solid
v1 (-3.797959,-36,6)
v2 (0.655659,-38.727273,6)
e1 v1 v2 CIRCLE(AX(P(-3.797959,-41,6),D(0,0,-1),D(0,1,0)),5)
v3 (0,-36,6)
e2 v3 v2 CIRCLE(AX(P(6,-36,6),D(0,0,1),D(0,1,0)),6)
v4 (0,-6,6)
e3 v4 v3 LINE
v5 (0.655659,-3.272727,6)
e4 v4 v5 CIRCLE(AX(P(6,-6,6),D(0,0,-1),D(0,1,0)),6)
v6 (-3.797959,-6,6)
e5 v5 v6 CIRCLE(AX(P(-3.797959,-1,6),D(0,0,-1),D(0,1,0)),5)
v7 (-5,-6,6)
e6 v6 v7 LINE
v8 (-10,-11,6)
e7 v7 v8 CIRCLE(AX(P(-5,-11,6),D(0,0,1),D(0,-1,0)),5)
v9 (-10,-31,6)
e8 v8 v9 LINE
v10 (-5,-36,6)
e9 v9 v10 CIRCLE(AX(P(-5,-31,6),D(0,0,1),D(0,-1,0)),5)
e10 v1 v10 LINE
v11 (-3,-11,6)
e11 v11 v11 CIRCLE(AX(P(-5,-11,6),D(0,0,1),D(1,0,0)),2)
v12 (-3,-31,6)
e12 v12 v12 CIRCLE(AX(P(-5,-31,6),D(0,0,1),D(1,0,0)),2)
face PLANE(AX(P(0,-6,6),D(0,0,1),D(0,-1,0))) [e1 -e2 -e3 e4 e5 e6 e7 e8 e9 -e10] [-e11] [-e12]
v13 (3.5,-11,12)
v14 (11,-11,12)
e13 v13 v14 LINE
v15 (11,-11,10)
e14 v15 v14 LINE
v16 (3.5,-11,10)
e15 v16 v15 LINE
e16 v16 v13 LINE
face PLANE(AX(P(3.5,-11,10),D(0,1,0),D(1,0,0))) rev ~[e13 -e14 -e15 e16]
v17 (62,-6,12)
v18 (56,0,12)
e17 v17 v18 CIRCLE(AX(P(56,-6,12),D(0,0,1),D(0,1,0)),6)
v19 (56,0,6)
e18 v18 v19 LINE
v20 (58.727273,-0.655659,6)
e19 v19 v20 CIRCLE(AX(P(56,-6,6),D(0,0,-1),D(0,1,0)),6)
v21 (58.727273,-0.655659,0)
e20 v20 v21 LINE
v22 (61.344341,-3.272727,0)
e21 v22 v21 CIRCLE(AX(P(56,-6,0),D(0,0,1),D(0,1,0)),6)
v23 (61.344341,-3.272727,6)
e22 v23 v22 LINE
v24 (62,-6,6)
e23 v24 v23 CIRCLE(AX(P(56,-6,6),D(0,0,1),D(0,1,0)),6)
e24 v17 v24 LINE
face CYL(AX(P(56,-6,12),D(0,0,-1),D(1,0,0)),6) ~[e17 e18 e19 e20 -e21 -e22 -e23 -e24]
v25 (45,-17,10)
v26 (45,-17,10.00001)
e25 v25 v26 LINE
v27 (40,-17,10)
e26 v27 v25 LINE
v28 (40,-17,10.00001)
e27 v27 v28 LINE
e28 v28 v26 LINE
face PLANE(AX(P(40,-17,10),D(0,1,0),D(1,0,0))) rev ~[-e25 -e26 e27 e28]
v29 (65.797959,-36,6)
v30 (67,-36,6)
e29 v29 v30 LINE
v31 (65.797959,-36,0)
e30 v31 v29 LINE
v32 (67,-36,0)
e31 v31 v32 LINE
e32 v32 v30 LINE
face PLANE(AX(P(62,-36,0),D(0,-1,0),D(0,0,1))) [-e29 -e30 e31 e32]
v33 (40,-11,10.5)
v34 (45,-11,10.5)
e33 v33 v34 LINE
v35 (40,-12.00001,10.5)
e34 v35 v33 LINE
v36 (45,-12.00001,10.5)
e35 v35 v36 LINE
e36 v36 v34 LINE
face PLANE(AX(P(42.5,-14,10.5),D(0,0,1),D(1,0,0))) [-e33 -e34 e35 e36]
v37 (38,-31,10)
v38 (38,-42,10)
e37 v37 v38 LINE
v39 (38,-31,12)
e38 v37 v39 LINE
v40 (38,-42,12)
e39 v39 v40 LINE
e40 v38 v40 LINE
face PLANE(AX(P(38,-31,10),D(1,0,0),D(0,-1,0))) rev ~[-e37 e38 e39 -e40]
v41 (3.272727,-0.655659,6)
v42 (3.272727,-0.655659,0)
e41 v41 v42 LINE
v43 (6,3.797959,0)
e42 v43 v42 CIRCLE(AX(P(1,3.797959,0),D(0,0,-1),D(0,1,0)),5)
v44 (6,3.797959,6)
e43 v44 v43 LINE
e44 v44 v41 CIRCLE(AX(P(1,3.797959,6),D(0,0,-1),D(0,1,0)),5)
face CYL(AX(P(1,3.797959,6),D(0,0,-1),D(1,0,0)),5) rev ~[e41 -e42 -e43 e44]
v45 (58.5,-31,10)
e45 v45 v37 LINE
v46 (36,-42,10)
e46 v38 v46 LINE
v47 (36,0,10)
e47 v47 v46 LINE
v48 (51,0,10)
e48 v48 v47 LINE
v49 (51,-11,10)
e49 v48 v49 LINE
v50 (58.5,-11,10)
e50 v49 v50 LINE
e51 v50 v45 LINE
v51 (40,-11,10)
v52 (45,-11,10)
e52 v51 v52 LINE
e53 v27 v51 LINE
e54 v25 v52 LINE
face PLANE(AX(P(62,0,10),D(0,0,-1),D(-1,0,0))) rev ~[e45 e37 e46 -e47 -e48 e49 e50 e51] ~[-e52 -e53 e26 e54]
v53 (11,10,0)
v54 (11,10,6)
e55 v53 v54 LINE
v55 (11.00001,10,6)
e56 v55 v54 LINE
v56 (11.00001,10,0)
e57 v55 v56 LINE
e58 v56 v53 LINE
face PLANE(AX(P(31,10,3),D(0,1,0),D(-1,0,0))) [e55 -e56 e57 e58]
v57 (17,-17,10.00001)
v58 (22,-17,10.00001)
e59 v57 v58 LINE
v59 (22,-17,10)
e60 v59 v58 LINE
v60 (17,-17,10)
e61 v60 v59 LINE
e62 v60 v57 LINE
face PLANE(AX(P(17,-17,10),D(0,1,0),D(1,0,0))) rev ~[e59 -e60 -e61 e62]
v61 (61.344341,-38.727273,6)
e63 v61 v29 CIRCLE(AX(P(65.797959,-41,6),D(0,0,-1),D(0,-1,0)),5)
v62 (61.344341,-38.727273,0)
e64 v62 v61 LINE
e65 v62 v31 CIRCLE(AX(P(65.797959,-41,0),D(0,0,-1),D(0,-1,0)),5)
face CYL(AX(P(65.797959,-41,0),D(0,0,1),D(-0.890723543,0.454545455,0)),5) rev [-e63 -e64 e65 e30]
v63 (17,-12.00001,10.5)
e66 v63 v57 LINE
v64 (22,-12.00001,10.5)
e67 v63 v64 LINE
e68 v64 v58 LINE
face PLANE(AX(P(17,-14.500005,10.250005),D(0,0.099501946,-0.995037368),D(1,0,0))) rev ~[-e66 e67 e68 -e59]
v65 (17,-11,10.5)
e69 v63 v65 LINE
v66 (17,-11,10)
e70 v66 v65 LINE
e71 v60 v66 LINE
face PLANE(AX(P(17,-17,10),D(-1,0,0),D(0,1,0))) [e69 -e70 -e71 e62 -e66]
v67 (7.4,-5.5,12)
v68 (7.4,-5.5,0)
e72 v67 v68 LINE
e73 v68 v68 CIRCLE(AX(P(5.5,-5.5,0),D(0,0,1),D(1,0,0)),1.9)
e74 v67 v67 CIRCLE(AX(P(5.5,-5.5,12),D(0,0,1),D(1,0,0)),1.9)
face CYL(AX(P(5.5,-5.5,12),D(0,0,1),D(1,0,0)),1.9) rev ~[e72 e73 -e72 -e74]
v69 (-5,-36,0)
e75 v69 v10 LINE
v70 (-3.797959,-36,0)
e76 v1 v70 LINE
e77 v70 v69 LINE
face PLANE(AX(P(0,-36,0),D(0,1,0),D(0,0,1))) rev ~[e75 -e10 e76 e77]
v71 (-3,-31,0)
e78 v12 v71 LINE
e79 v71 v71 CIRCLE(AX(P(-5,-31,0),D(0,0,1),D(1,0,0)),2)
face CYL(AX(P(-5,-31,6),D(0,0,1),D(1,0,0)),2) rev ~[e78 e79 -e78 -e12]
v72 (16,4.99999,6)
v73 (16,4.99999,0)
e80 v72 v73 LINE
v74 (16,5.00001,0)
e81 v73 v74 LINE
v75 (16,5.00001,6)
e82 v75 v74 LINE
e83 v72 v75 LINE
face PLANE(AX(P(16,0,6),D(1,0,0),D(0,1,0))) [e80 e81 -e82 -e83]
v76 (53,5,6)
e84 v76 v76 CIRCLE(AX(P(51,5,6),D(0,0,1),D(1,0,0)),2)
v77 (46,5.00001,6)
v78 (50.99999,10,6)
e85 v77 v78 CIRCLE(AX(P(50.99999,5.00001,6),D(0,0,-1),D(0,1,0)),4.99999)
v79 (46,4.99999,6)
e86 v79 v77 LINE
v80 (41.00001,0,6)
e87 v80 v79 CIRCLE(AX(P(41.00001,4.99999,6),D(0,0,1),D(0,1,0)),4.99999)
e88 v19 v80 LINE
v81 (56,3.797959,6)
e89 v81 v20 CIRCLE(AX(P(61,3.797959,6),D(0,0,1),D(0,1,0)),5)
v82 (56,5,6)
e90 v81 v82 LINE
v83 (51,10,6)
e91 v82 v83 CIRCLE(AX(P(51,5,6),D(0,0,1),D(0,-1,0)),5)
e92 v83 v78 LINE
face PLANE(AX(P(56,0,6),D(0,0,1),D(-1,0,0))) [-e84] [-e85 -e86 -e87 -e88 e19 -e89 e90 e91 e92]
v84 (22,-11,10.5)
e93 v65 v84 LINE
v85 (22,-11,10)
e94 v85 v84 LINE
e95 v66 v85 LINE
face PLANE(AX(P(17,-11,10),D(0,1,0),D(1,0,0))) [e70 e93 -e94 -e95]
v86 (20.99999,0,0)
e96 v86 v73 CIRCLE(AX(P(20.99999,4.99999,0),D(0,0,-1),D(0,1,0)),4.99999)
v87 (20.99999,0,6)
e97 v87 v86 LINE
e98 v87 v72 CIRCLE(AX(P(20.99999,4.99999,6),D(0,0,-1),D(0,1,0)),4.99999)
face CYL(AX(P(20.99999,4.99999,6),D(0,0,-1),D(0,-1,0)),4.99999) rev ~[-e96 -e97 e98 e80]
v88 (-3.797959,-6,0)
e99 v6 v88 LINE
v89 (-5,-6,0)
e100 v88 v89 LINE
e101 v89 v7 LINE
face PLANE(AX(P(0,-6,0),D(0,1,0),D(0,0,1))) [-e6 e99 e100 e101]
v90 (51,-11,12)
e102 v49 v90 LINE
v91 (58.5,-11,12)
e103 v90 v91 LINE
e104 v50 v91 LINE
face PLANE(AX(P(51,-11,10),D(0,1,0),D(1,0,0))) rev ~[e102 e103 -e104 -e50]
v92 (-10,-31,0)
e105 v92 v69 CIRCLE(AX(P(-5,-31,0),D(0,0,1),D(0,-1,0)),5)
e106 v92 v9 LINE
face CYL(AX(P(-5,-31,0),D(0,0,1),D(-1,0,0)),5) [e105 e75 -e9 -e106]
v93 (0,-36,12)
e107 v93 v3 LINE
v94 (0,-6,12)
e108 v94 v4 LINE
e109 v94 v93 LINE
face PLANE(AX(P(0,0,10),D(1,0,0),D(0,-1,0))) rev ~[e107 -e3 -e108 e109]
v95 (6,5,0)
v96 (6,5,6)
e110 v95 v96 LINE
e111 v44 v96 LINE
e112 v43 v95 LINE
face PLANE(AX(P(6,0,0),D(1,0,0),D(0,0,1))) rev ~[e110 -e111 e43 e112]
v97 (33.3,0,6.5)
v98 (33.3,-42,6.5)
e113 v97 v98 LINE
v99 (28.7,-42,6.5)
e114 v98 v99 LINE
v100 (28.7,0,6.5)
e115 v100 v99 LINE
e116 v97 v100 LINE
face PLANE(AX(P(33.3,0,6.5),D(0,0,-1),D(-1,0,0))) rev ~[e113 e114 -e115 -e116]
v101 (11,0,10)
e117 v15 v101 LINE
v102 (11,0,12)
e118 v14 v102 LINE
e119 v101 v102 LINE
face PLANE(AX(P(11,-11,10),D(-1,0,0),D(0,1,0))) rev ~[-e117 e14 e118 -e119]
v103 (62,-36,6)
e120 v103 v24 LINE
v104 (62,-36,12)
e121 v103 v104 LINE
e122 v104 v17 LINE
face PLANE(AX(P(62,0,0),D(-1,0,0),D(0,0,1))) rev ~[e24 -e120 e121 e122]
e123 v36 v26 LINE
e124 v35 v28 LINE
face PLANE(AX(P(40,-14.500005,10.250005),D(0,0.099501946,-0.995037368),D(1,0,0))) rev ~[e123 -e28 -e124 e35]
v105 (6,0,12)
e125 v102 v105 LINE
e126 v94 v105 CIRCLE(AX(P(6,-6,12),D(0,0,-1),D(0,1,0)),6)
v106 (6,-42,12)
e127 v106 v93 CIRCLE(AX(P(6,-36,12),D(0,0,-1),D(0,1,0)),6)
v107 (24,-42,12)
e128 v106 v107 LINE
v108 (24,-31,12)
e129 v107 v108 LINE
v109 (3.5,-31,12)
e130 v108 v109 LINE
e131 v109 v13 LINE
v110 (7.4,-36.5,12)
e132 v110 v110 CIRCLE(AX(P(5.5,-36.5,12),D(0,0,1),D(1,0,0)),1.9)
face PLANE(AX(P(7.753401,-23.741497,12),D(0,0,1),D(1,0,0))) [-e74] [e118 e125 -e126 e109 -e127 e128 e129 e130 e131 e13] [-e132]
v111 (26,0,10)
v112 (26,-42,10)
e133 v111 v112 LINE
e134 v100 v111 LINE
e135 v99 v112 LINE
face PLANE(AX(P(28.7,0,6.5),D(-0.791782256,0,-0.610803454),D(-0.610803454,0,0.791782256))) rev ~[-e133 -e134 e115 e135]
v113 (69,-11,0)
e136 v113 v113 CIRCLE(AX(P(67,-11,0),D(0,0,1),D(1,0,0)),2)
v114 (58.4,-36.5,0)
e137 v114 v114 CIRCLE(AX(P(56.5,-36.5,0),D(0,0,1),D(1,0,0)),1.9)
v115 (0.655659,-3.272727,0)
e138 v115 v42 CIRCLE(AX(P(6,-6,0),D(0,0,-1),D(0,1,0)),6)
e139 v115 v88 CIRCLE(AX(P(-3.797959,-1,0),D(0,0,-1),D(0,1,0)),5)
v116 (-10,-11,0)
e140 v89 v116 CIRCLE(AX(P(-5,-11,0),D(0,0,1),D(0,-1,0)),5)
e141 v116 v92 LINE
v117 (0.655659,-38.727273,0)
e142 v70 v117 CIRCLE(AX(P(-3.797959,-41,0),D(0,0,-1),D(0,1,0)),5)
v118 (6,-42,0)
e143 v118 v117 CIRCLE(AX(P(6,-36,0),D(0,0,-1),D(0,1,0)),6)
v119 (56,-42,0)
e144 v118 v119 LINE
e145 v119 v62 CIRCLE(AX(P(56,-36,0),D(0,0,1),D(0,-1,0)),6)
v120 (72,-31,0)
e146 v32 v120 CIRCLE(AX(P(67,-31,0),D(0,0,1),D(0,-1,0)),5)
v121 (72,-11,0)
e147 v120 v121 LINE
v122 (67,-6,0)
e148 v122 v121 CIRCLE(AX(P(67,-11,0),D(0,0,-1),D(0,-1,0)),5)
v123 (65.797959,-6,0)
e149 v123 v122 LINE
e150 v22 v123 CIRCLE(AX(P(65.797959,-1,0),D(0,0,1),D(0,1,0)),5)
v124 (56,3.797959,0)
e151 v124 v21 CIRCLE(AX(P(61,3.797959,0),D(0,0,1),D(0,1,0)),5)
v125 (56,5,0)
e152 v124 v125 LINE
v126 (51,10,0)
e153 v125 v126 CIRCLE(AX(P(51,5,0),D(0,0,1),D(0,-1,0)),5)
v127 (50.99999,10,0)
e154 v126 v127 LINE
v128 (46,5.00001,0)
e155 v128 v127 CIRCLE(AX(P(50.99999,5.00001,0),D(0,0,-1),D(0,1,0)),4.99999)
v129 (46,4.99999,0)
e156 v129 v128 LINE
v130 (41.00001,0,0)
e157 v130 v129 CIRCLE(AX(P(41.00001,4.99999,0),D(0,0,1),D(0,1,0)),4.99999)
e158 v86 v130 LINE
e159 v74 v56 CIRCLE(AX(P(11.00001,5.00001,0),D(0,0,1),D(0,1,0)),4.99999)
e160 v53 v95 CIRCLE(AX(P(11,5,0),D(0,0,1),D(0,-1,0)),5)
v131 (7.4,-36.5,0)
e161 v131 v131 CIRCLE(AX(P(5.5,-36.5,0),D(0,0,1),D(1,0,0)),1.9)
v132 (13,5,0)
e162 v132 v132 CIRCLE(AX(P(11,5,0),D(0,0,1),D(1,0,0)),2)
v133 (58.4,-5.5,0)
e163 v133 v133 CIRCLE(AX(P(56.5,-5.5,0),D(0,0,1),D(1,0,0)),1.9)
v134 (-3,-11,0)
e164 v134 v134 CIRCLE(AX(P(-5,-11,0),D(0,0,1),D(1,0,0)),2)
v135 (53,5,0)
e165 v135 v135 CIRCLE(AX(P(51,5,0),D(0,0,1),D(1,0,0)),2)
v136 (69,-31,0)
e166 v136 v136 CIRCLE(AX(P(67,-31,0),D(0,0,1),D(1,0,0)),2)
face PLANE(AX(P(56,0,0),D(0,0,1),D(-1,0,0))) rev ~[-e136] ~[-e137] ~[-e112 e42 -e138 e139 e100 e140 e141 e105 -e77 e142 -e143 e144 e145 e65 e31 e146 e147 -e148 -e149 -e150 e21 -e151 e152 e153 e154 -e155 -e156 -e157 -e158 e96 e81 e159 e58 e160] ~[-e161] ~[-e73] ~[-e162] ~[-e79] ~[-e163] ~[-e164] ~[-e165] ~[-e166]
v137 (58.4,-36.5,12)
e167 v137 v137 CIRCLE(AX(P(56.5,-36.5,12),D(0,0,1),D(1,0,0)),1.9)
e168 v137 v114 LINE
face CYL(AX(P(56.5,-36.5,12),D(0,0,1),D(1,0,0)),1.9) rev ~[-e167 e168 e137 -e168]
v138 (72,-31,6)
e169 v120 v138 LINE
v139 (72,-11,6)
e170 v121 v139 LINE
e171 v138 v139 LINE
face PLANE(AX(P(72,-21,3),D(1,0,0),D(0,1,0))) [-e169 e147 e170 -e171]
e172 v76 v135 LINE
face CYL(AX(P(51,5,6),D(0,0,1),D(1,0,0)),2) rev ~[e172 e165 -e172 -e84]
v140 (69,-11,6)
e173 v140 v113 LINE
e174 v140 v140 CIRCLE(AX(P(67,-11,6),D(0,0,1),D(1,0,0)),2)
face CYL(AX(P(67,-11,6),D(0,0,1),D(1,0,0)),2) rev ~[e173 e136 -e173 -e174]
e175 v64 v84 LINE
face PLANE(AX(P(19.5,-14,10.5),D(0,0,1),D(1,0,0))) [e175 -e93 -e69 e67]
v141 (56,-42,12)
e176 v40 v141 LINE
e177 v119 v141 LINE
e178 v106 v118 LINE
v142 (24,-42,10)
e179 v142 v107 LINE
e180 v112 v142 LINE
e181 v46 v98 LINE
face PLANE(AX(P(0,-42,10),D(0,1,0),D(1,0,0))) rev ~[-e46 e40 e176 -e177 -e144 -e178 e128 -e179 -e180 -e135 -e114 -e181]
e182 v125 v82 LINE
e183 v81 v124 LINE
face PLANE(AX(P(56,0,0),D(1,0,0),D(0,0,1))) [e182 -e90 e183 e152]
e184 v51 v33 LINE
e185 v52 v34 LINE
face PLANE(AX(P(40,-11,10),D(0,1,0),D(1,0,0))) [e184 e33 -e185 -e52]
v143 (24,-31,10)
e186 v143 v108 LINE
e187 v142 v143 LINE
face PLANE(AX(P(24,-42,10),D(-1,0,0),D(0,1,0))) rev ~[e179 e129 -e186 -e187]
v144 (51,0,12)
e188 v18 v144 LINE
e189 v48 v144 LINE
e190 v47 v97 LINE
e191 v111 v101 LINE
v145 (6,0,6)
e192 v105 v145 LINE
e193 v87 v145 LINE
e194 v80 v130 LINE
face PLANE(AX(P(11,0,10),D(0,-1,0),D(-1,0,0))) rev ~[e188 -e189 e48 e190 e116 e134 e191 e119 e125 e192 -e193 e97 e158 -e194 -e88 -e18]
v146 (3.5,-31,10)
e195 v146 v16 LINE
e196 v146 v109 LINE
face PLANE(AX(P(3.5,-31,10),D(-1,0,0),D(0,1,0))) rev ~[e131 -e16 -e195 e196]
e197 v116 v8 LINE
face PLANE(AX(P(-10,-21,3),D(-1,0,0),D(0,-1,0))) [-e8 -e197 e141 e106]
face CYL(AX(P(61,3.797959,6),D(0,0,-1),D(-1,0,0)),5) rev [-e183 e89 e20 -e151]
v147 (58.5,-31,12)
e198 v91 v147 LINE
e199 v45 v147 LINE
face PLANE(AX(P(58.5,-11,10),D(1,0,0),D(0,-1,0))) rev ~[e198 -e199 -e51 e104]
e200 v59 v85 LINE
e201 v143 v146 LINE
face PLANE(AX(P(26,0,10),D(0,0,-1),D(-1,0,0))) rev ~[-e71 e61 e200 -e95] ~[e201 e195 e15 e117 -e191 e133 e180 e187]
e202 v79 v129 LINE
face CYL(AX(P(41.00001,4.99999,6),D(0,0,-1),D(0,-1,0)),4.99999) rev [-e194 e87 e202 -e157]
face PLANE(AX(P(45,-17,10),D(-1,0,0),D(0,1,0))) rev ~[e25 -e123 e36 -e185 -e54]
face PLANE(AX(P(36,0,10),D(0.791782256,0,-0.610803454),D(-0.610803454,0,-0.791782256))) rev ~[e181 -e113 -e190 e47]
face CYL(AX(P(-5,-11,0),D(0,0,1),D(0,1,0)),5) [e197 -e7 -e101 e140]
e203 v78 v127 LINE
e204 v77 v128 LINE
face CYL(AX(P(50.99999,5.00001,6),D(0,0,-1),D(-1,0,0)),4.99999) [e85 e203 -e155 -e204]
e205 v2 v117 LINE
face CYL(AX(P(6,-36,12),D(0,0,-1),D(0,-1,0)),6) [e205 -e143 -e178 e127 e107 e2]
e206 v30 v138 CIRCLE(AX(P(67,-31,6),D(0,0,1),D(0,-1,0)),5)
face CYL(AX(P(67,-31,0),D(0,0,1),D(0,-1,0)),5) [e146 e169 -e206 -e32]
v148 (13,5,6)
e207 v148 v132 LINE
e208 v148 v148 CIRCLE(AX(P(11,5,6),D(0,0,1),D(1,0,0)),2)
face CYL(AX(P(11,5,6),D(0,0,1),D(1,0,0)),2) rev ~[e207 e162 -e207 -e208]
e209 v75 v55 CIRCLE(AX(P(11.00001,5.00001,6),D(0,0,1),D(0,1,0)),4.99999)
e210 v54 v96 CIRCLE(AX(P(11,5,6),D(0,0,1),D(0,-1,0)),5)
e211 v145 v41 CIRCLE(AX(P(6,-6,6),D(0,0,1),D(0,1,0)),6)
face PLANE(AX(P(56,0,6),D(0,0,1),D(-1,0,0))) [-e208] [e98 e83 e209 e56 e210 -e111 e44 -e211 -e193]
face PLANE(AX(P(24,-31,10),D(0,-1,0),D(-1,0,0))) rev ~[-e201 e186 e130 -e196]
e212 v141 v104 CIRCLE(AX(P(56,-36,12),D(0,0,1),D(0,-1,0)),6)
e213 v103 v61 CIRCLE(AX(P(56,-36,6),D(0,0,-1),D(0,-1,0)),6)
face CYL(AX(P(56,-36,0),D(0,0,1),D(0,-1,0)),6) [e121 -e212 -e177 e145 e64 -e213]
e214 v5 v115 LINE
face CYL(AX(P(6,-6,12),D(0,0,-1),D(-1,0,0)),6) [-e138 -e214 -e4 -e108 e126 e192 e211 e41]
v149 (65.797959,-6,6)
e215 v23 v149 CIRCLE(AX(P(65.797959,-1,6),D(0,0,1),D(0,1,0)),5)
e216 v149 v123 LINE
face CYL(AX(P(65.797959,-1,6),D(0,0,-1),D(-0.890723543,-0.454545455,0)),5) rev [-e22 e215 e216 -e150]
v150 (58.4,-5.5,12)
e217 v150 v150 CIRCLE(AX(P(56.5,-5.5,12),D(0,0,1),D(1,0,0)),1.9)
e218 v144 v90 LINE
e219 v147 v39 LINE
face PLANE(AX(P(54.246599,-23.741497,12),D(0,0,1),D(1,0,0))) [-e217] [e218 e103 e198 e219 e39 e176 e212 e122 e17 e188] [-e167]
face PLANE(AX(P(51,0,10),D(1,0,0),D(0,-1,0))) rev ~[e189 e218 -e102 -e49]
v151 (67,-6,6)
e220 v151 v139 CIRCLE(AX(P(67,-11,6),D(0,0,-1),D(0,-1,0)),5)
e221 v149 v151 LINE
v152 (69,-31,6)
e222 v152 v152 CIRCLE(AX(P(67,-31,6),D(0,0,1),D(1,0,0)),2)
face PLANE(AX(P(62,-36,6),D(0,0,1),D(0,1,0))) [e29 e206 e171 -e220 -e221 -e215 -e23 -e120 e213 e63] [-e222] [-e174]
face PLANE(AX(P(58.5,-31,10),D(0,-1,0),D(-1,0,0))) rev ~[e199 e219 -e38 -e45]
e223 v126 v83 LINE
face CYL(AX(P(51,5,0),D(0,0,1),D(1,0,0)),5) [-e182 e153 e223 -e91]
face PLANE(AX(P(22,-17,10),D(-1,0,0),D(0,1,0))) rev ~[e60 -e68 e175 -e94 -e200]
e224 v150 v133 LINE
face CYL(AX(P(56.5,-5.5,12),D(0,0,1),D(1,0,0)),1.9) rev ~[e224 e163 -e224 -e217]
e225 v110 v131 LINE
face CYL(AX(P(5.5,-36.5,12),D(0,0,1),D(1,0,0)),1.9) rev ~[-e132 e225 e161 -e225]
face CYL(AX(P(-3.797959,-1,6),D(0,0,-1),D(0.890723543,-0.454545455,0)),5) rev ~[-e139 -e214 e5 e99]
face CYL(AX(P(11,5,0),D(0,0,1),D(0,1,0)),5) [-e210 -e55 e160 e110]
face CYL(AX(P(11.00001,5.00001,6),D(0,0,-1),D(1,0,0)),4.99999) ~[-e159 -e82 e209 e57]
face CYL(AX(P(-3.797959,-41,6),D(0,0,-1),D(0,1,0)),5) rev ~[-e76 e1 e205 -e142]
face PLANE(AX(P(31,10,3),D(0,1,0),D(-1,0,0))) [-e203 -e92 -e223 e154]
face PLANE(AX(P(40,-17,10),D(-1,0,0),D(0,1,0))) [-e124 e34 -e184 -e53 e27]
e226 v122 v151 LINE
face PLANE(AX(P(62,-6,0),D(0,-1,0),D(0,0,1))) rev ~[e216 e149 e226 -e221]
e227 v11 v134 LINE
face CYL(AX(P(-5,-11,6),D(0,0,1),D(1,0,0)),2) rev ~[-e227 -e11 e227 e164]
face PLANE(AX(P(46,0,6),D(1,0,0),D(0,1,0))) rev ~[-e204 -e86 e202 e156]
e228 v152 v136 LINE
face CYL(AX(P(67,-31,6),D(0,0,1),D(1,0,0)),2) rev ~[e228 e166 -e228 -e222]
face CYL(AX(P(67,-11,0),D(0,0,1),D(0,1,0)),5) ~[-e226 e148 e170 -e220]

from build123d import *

# Parameters (mm, degrees)
F1_DEPTH    = 42
F4_DEPTH    = 2
F5_R        = 1.9
F6_DEPTH    = 12
F7_R        = 6
F8_W        = 30
F8_H        = 6
F9_DEPTH    = 10
F10_W       = 30
F10_H       = 6
F11_DEPTH   = 10
F12_W       = 50
F12_H       = 6
F13_DEPTH   = 10
F14_R       = 5
F15_R       = 2
F16_DEPTH   = 6
F17_W       = 5
F17_H       = 6
F18_DEPTH   = 0.5
F19_SIZE2   = 0.49999
F19_SIZE    = 4.99999
F19_2_SIZE2 = 0.49999
F19_2_SIZE  = 4.99999
F20_W       = 30
F20_H       = 10
F21_DEPTH   = 6
F22_R       = 4.99999


# Not quite as in the source:
# - a fillet or chamfer is up to 0.001 mm smaller than in the source, because OpenCascade refuses the exact size


with BuildPart() as f1:
    # F0 (on Front) → F1 (new body)
    with BuildSketch(Plane.XZ):
        Polygon((0, 10), (0, 0), (62, 0), (62, 10), (36, 10), (33.3, 6.5), (28.7, 6.5), (26, 10), align=None)
    extrude(amount=F1_DEPTH)

    # F3 (on face) → F4 (join)
    with BuildSketch(Plane.XY.offset(10)):
        Polygon((0, -42), (24, -42), (24, -31), (3.5, -31), (3.5, -11), (11, -11), (11, 0), (0, 0), align=None)
        Polygon((38, -42), (62, -42), (62, 0), (51, 0), (51, -11), (58.5, -11), (58.5, -31), (38, -31), align=None)
    extrude(amount=F4_DEPTH)

    # F5 (on face) → F6 (cut, through all)
    with BuildSketch(Plane.XY.offset(12)):
        with Locations((5.5, -5.5)):
            Circle(F5_R)
        with Locations((56.5, -5.5)):
            Circle(F5_R)
        with Locations((5.5, -36.5)):
            Circle(F5_R)
        with Locations((56.5, -36.5)):
            Circle(F5_R)
    extrude(amount=-F6_DEPTH, mode=Mode.SUBTRACT)

    # F7
    f7_edges = [f1.edges().sort_by_distance(p)[0] for p in [
        (0, -42, 6),
        (0, 0, 6),
        (62, -42, 6),
        (62, 0, 6),
    ]]
    fillet(f7_edges, radius=F7_R)

    # F8 (on face) → F9 (join)
    with BuildSketch(Plane.YZ.offset(62)):
        with Locations((-21, 3)):
            Rectangle(F8_W, F8_H)
    extrude(amount=F9_DEPTH)

    # F10 (on face) → F11 (join)
    with BuildSketch(Plane(origin=(0, 0, 0), x_dir=(0, -1, 0), z_dir=(-1, 0, 0))):
        with Locations((21, 3)):
            Rectangle(F10_W, F10_H)
    extrude(amount=F11_DEPTH)

    # F12 (on face) → F13 (join)
    with BuildSketch(Plane(origin=(0, 0, 0), x_dir=(-1, 0, 0), z_dir=(0, 1, 0))):
        with Locations((-31, 3)):
            Rectangle(F12_W, F12_H)
    extrude(amount=F13_DEPTH)

    # F14
    f14_edges = [f1.edges().sort_by_distance(p)[0] for p in [
        (6, 10, 3),
        (-10, -6, 3),
        (-10, -36, 3),
        (56, 10, 3),
        (72, -6, 3),
        (72, -36, 3),
        (6, 0, 9),
        (6, 0, 3),
        (0, -6, 9),
        (0, -6, 3),
        (0, -36, 9),
        (0, -36, 3),
        (56, 0, 9),
        (56, 0, 3),
        (62, -6, 9),
        (62, -6, 3),
        (62, -36, 3),
        (62, -36, 9),
    ]]
    fillet(f14_edges, radius=F14_R)

    # F15 (on face) → F16 (cut, through all)
    with BuildSketch(Plane.XY.offset(6)):
        with Locations((-5, -11)):
            Circle(F15_R)
        with Locations((-5, -31)):
            Circle(F15_R)
        with Locations((11, 5)):
            Circle(F15_R)
        with Locations((51, 5)):
            Circle(F15_R)
        with Locations((67, -11)):
            Circle(F15_R)
        with Locations((67, -31)):
            Circle(F15_R)
    extrude(amount=-F16_DEPTH, mode=Mode.SUBTRACT)

    # F17 (on face) → F18 (join)
    with BuildSketch(Plane.XY.offset(10)):
        with Locations((19.5, -14)):
            Rectangle(F17_W, F17_H)
        with Locations((42.5, -14)):
            Rectangle(F17_W, F17_H)
    extrude(amount=F18_DEPTH)

    # F19 (size 5 and 0.5 in the source; OpenCascade refuses exactly that, so slightly less here)
    f19_edges = [f1.edges().sort_by_distance(p)[0] for p in [
        (19.5, -17, 10.5),
    ]]
    f19_side = f1.faces().sort_by_distance((19.5, -14, 10.5))[0]
    chamfer(f19_edges, length=F19_SIZE, length2=F19_SIZE2, reference=f19_side)

    # F19#2 (size 5 and 0.5 in the source; OpenCascade refuses exactly that, so slightly less here)
    f19_2_edges = [f1.edges().sort_by_distance(p)[0] for p in [
        (42.5, -17, 10.5),
    ]]
    f19_2_side = f1.faces().sort_by_distance((42.5, -14, 10.5))[0]
    chamfer(f19_2_edges, length=F19_2_SIZE, length2=F19_2_SIZE2, reference=f19_2_side)

    # F20 (on face) → F21 (cut, through all)
    with BuildSketch(Plane.XY.offset(6)):
        with Locations((31, 5)):
            Rectangle(F20_W, F20_H)
    extrude(amount=-F21_DEPTH, mode=Mode.SUBTRACT)

    # F22 (radius 5 in the source; OpenCascade refuses exactly that, so slightly less here)
    f22_edges = [f1.edges().sort_by_distance(p)[0] for p in [
        (16, 10, 3),
        (46, 10, 3),
        (16, 0, 3),
        (46, 0, 3),
    ]]
    fillet(f22_edges, radius=F22_R)


solid = f1.part
